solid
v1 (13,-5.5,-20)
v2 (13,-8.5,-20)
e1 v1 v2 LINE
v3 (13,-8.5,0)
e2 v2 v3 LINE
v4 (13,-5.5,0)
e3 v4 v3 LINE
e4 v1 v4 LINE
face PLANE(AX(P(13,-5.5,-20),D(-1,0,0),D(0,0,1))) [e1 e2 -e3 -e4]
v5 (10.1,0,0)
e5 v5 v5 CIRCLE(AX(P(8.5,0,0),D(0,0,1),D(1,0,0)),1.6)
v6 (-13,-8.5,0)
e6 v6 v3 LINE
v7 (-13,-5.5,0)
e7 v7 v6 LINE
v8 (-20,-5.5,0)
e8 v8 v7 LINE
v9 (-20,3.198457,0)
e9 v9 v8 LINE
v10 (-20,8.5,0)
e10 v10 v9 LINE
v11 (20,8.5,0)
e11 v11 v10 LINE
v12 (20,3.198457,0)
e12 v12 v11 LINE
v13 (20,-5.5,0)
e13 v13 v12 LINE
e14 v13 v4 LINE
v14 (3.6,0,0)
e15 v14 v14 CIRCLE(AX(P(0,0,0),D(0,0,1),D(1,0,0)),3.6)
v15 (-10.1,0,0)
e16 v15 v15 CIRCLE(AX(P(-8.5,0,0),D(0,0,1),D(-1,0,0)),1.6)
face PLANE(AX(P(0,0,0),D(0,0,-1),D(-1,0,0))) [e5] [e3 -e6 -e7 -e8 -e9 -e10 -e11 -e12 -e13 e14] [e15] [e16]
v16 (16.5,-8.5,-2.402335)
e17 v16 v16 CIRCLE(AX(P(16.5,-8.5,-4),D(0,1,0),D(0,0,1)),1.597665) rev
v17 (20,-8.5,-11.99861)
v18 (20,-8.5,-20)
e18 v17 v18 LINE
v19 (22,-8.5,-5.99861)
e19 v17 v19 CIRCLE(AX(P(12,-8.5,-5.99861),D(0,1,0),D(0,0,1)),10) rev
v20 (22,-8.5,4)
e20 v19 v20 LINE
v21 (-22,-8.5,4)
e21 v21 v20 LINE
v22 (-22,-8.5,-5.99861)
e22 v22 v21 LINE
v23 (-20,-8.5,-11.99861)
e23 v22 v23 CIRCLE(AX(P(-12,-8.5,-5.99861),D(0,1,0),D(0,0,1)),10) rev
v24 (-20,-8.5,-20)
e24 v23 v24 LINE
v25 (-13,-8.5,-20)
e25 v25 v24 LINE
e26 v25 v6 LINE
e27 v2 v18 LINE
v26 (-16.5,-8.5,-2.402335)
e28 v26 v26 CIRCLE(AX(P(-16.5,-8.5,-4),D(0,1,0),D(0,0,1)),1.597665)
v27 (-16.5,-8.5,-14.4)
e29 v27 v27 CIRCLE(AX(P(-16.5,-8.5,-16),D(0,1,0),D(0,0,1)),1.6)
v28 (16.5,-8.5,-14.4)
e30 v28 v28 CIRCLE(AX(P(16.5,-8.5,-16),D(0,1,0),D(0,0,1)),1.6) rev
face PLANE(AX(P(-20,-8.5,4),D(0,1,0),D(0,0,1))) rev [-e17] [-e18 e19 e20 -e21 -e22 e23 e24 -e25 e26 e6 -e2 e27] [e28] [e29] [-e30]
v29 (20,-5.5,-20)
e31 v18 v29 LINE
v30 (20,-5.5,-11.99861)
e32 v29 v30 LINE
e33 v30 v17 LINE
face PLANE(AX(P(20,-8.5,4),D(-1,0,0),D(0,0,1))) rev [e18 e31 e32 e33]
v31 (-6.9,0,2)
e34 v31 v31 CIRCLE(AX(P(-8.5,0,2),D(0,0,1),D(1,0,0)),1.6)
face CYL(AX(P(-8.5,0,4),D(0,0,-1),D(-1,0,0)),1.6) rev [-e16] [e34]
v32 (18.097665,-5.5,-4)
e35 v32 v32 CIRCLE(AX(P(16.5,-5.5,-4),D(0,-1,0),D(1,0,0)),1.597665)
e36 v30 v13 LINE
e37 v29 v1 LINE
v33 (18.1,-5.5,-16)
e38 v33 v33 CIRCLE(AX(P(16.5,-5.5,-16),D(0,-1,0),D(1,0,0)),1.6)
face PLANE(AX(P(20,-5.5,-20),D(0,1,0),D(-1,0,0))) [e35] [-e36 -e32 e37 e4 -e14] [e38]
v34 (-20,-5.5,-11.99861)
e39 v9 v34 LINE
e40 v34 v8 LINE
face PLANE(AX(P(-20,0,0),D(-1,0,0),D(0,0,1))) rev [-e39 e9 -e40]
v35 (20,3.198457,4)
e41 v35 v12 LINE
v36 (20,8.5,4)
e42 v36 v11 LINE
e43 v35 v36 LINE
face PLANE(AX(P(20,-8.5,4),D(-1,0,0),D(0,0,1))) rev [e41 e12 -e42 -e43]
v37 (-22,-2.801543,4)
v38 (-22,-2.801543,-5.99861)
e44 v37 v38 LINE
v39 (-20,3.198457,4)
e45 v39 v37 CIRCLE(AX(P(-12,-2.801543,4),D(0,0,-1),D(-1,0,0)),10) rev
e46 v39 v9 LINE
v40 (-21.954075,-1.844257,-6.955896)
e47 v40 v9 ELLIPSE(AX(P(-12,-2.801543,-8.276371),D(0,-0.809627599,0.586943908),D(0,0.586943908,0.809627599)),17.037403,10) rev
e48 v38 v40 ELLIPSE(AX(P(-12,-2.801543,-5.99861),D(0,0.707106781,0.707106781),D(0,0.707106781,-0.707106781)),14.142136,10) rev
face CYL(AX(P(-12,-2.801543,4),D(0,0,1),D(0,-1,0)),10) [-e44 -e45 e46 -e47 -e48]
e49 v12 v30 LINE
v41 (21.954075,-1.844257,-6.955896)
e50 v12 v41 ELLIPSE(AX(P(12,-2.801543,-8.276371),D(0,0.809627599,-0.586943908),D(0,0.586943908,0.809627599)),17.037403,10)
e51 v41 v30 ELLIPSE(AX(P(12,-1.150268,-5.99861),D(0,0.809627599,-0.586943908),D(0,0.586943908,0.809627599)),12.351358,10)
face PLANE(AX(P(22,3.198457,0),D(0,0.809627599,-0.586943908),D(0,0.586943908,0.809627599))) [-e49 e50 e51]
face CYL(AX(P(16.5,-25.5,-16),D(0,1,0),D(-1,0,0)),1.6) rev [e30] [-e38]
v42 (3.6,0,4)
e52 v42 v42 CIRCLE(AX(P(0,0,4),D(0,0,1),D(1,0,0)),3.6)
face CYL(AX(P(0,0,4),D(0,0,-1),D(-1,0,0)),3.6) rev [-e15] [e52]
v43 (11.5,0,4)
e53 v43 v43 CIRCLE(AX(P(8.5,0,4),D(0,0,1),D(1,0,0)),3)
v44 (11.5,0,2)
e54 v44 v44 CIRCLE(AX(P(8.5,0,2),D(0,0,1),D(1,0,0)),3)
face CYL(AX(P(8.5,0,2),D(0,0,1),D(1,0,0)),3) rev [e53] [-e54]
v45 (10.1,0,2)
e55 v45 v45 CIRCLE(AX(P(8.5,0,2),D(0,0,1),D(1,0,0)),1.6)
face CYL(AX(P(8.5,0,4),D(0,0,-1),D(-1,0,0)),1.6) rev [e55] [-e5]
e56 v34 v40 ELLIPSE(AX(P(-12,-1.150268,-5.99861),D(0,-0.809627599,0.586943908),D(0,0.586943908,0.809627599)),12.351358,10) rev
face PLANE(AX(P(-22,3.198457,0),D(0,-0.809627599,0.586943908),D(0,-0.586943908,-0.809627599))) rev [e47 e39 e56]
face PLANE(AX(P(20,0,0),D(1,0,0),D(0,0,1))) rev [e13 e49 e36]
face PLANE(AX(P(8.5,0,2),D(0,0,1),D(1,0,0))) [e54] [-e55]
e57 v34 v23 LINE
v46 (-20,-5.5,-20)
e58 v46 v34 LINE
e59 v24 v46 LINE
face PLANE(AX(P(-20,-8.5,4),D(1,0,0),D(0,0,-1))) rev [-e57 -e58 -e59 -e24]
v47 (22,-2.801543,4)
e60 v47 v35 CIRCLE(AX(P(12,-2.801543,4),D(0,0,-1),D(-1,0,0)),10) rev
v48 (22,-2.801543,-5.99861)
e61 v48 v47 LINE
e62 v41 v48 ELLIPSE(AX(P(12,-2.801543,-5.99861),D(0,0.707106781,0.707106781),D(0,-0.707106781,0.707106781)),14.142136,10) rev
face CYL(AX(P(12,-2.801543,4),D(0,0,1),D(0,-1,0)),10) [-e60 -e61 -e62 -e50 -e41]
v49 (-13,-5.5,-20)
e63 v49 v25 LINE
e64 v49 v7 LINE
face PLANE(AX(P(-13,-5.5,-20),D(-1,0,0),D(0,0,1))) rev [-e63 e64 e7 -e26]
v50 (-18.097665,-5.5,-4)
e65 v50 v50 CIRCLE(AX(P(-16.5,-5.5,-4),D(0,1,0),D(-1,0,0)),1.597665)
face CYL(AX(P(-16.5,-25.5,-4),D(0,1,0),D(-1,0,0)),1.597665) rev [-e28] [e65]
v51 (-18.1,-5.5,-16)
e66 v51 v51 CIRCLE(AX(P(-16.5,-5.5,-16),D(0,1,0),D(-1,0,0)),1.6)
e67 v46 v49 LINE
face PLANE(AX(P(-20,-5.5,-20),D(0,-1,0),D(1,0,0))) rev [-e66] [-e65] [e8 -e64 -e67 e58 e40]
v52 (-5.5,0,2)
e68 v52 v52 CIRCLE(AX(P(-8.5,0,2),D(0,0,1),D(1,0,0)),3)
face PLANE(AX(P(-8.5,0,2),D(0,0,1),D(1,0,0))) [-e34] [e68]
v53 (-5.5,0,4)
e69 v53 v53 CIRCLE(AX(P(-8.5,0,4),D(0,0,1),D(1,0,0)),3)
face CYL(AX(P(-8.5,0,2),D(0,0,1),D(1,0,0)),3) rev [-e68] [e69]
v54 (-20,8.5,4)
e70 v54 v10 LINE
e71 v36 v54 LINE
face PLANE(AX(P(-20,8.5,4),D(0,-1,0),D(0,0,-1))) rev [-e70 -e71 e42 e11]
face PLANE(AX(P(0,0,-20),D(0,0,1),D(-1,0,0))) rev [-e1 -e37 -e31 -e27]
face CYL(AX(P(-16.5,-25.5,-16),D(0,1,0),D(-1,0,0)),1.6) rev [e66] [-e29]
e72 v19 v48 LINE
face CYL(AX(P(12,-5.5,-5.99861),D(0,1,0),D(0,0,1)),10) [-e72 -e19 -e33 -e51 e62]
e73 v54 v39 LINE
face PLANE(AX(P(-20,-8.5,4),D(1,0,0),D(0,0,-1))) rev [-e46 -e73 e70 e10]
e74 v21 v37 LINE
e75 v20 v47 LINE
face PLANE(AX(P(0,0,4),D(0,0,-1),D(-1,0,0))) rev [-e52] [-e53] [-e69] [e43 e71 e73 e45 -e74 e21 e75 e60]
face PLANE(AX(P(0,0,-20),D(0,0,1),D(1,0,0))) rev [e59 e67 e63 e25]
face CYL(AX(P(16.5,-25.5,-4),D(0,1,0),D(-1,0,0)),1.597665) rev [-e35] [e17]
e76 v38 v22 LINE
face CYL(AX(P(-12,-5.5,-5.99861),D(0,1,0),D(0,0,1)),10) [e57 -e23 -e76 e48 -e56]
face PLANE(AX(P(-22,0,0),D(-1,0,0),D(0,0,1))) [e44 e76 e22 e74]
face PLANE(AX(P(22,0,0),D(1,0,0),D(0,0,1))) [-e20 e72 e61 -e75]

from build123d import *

# Parameters (mm, degrees)
SKETCH1_W            = 40
SKETCH1_H            = 17
SKETCH1_R            = 3.6
SKETCH1_R_2          = 1.6
BOSS_EXTRUDE1_DEPTH  = 4
SKETCH2_W            = 7
SKETCH2_H            = 3
BOSS_EXTRUDE2_DEPTH  = 20
SKETCH3_R            = 1.597664911
SKETCH3_R_2          = 1.6
CUT_EXTRUDE1_DEPTH   = 20
BOSS_EXTRUDE3_DEPTH  = 2
FILLET1_R            = 10
FILLET1_OF_MIRROR1_R = 10
SKETCH5_R            = 3
CUT_EXTRUDE2_DEPTH   = 2


with BuildPart() as part:
    # Sketch1 → Boss-Extrude1 (new body)
    with BuildSketch(Plane.XY):
        Rectangle(SKETCH1_W, SKETCH1_H)
        Circle(SKETCH1_R, mode=Mode.SUBTRACT)
        with Locations((8.5, 0)):
            Circle(SKETCH1_R_2, mode=Mode.SUBTRACT)
        with Locations(Location((-8.5, 0, 0), (0, 0, 180))):
            Circle(SKETCH1_R_2, mode=Mode.SUBTRACT)
    extrude(amount=BOSS_EXTRUDE1_DEPTH)

    # Sketch2 → Boss-Extrude2 (add)
    with BuildSketch(Plane(origin=(0, 0, 0), x_dir=(-1, 0, 0), z_dir=(0, 0, -1))):
        with Locations((16.5, -7)):
            Rectangle(SKETCH2_W, SKETCH2_H)
    boss_extrude2 = extrude(amount=BOSS_EXTRUDE2_DEPTH)

    # Sketch3 → Cut-Extrude1 (cut)
    with BuildSketch(Plane(origin=(0, -5.5, 0), x_dir=(1, 0, 0), z_dir=(0, 1, 0))):
        with Locations(Location((-16.5, 4, 0), (0, 0, 180))):
            Circle(SKETCH3_R)
        with Locations(Location((-16.5, 16, 0), (0, 0, 180))):
            Circle(SKETCH3_R_2)
    cut_extrude1 = extrude(amount=-CUT_EXTRUDE1_DEPTH, mode=Mode.SUBTRACT)

    # Sketch4 → Boss-Extrude3 (add)
    with BuildSketch(Plane.ZY.offset(20)):
        Polygon((0, 3.19845738), (-11.998610201, -5.5), (-11.998610201, -8.5), (4, -8.5), (4, 3.19845738), align=None)
    boss_extrude3 = extrude(amount=BOSS_EXTRUDE3_DEPTH)

    # Fillet1
    # the kernel refuses this fillet: 10 mm, written as the material it takes off along each edge
    with BuildSketch(Plane(origin=(-22, 9.5, -11.998610201), x_dir=(0, 0, 1), z_dir=(0, -1, 0))) as fillet1_piece_1:
        with BuildLine():
            CenterArc((6, -10), FILLET1_R, 90, 36.869897646)
            Line((0, -2), (-0.12, -1.84))
            ThreePointArc((-0.12, -1.84), (-0.2, -1), (-0.2, 0))
            Line((-0.2, 0), (0, 0.2))
            Line((0, 0.2), (6, 0.2))
            Line((6, 0.2), (6, 0))
        make_face()
    extrude(amount=33, mode=Mode.SUBTRACT)
    with BuildSketch(Plane(origin=(-22, 3.19845738, 19), x_dir=(1, 0, 0), z_dir=(0, 0, -1))) as fillet1_piece_2:
        with BuildLine():
            CenterArc((10, 6), FILLET1_R, 180, 36.869897646)
            Line((0, 6), (-0.2, 6))
            Line((-0.2, 6), (-0.2, 0))
            Line((-0.2, 0), (0, -0.2))
            ThreePointArc((0, -0.2), (1, -0.2), (1.84, -0.12))
            Line((1.84, -0.12), (2, 0))
        make_face()
    extrude(amount=34, mode=Mode.SUBTRACT)

    # Mirror1: Boss-Extrude2, Cut-Extrude1, Boss-Extrude3 across plane
    add(boss_extrude2.mirror(Plane(origin=(0, 0, 0), x_dir=(0, 0, 1), z_dir=(1, 0, 0))))
    add(cut_extrude1.mirror(Plane(origin=(0, 0, 0), x_dir=(0, 0, 1), z_dir=(1, 0, 0))), mode=Mode.SUBTRACT)
    add(boss_extrude3.mirror(Plane(origin=(0, 0, 0), x_dir=(0, 0, 1), z_dir=(1, 0, 0))))

    # Fillet1 of Mirror1
    # the kernel refuses this fillet: 10 mm, written as the material it takes off along each edge
    with BuildSketch(Plane(origin=(22, 9.5, -11.998610201), x_dir=(-1, 0, 0), z_dir=(0, -1, 0))) as fillet1_of_mirror1_piece_1:
        with BuildLine():
            CenterArc((10, -6), FILLET1_OF_MIRROR1_R, 143.130102354, 36.869897646)
            Line((0, -6), (-0.2, -6))
            Line((-0.2, -6), (-0.2, 0))
            Line((-0.2, 0), (0, 0.2))
            ThreePointArc((0, 0.2), (1, 0.2), (1.84, 0.12))
            Line((1.84, 0.12), (2, 0))
        make_face()
    extrude(amount=33, mode=Mode.SUBTRACT)
    with BuildSketch(Plane(origin=(22, 3.19845738, 19), x_dir=(-1, 0, 0), z_dir=(0, 0, -1))) as fillet1_of_mirror1_piece_2:
        with BuildLine():
            CenterArc((10, -6), FILLET1_OF_MIRROR1_R, 143.130102354, 36.869897646)
            Line((0, -6), (-0.2, -6))
            Line((-0.2, -6), (-0.2, 0))
            Line((-0.2, 0), (0, 0.2))
            ThreePointArc((0, 0.2), (1, 0.2), (1.84, 0.12))
            Line((1.84, 0.12), (2, 0))
        make_face()
    extrude(amount=34, mode=Mode.SUBTRACT)

    # Sketch5 → Cut-Extrude2 (cut)
    with BuildSketch(Plane.XY.offset(4)):
        with Locations((-8.5, 0)):
            Circle(SKETCH5_R)
        with Locations((8.5, 0)):
            Circle(SKETCH5_R)
    extrude(amount=-CUT_EXTRUDE2_DEPTH, mode=Mode.SUBTRACT)


solid = part.part
